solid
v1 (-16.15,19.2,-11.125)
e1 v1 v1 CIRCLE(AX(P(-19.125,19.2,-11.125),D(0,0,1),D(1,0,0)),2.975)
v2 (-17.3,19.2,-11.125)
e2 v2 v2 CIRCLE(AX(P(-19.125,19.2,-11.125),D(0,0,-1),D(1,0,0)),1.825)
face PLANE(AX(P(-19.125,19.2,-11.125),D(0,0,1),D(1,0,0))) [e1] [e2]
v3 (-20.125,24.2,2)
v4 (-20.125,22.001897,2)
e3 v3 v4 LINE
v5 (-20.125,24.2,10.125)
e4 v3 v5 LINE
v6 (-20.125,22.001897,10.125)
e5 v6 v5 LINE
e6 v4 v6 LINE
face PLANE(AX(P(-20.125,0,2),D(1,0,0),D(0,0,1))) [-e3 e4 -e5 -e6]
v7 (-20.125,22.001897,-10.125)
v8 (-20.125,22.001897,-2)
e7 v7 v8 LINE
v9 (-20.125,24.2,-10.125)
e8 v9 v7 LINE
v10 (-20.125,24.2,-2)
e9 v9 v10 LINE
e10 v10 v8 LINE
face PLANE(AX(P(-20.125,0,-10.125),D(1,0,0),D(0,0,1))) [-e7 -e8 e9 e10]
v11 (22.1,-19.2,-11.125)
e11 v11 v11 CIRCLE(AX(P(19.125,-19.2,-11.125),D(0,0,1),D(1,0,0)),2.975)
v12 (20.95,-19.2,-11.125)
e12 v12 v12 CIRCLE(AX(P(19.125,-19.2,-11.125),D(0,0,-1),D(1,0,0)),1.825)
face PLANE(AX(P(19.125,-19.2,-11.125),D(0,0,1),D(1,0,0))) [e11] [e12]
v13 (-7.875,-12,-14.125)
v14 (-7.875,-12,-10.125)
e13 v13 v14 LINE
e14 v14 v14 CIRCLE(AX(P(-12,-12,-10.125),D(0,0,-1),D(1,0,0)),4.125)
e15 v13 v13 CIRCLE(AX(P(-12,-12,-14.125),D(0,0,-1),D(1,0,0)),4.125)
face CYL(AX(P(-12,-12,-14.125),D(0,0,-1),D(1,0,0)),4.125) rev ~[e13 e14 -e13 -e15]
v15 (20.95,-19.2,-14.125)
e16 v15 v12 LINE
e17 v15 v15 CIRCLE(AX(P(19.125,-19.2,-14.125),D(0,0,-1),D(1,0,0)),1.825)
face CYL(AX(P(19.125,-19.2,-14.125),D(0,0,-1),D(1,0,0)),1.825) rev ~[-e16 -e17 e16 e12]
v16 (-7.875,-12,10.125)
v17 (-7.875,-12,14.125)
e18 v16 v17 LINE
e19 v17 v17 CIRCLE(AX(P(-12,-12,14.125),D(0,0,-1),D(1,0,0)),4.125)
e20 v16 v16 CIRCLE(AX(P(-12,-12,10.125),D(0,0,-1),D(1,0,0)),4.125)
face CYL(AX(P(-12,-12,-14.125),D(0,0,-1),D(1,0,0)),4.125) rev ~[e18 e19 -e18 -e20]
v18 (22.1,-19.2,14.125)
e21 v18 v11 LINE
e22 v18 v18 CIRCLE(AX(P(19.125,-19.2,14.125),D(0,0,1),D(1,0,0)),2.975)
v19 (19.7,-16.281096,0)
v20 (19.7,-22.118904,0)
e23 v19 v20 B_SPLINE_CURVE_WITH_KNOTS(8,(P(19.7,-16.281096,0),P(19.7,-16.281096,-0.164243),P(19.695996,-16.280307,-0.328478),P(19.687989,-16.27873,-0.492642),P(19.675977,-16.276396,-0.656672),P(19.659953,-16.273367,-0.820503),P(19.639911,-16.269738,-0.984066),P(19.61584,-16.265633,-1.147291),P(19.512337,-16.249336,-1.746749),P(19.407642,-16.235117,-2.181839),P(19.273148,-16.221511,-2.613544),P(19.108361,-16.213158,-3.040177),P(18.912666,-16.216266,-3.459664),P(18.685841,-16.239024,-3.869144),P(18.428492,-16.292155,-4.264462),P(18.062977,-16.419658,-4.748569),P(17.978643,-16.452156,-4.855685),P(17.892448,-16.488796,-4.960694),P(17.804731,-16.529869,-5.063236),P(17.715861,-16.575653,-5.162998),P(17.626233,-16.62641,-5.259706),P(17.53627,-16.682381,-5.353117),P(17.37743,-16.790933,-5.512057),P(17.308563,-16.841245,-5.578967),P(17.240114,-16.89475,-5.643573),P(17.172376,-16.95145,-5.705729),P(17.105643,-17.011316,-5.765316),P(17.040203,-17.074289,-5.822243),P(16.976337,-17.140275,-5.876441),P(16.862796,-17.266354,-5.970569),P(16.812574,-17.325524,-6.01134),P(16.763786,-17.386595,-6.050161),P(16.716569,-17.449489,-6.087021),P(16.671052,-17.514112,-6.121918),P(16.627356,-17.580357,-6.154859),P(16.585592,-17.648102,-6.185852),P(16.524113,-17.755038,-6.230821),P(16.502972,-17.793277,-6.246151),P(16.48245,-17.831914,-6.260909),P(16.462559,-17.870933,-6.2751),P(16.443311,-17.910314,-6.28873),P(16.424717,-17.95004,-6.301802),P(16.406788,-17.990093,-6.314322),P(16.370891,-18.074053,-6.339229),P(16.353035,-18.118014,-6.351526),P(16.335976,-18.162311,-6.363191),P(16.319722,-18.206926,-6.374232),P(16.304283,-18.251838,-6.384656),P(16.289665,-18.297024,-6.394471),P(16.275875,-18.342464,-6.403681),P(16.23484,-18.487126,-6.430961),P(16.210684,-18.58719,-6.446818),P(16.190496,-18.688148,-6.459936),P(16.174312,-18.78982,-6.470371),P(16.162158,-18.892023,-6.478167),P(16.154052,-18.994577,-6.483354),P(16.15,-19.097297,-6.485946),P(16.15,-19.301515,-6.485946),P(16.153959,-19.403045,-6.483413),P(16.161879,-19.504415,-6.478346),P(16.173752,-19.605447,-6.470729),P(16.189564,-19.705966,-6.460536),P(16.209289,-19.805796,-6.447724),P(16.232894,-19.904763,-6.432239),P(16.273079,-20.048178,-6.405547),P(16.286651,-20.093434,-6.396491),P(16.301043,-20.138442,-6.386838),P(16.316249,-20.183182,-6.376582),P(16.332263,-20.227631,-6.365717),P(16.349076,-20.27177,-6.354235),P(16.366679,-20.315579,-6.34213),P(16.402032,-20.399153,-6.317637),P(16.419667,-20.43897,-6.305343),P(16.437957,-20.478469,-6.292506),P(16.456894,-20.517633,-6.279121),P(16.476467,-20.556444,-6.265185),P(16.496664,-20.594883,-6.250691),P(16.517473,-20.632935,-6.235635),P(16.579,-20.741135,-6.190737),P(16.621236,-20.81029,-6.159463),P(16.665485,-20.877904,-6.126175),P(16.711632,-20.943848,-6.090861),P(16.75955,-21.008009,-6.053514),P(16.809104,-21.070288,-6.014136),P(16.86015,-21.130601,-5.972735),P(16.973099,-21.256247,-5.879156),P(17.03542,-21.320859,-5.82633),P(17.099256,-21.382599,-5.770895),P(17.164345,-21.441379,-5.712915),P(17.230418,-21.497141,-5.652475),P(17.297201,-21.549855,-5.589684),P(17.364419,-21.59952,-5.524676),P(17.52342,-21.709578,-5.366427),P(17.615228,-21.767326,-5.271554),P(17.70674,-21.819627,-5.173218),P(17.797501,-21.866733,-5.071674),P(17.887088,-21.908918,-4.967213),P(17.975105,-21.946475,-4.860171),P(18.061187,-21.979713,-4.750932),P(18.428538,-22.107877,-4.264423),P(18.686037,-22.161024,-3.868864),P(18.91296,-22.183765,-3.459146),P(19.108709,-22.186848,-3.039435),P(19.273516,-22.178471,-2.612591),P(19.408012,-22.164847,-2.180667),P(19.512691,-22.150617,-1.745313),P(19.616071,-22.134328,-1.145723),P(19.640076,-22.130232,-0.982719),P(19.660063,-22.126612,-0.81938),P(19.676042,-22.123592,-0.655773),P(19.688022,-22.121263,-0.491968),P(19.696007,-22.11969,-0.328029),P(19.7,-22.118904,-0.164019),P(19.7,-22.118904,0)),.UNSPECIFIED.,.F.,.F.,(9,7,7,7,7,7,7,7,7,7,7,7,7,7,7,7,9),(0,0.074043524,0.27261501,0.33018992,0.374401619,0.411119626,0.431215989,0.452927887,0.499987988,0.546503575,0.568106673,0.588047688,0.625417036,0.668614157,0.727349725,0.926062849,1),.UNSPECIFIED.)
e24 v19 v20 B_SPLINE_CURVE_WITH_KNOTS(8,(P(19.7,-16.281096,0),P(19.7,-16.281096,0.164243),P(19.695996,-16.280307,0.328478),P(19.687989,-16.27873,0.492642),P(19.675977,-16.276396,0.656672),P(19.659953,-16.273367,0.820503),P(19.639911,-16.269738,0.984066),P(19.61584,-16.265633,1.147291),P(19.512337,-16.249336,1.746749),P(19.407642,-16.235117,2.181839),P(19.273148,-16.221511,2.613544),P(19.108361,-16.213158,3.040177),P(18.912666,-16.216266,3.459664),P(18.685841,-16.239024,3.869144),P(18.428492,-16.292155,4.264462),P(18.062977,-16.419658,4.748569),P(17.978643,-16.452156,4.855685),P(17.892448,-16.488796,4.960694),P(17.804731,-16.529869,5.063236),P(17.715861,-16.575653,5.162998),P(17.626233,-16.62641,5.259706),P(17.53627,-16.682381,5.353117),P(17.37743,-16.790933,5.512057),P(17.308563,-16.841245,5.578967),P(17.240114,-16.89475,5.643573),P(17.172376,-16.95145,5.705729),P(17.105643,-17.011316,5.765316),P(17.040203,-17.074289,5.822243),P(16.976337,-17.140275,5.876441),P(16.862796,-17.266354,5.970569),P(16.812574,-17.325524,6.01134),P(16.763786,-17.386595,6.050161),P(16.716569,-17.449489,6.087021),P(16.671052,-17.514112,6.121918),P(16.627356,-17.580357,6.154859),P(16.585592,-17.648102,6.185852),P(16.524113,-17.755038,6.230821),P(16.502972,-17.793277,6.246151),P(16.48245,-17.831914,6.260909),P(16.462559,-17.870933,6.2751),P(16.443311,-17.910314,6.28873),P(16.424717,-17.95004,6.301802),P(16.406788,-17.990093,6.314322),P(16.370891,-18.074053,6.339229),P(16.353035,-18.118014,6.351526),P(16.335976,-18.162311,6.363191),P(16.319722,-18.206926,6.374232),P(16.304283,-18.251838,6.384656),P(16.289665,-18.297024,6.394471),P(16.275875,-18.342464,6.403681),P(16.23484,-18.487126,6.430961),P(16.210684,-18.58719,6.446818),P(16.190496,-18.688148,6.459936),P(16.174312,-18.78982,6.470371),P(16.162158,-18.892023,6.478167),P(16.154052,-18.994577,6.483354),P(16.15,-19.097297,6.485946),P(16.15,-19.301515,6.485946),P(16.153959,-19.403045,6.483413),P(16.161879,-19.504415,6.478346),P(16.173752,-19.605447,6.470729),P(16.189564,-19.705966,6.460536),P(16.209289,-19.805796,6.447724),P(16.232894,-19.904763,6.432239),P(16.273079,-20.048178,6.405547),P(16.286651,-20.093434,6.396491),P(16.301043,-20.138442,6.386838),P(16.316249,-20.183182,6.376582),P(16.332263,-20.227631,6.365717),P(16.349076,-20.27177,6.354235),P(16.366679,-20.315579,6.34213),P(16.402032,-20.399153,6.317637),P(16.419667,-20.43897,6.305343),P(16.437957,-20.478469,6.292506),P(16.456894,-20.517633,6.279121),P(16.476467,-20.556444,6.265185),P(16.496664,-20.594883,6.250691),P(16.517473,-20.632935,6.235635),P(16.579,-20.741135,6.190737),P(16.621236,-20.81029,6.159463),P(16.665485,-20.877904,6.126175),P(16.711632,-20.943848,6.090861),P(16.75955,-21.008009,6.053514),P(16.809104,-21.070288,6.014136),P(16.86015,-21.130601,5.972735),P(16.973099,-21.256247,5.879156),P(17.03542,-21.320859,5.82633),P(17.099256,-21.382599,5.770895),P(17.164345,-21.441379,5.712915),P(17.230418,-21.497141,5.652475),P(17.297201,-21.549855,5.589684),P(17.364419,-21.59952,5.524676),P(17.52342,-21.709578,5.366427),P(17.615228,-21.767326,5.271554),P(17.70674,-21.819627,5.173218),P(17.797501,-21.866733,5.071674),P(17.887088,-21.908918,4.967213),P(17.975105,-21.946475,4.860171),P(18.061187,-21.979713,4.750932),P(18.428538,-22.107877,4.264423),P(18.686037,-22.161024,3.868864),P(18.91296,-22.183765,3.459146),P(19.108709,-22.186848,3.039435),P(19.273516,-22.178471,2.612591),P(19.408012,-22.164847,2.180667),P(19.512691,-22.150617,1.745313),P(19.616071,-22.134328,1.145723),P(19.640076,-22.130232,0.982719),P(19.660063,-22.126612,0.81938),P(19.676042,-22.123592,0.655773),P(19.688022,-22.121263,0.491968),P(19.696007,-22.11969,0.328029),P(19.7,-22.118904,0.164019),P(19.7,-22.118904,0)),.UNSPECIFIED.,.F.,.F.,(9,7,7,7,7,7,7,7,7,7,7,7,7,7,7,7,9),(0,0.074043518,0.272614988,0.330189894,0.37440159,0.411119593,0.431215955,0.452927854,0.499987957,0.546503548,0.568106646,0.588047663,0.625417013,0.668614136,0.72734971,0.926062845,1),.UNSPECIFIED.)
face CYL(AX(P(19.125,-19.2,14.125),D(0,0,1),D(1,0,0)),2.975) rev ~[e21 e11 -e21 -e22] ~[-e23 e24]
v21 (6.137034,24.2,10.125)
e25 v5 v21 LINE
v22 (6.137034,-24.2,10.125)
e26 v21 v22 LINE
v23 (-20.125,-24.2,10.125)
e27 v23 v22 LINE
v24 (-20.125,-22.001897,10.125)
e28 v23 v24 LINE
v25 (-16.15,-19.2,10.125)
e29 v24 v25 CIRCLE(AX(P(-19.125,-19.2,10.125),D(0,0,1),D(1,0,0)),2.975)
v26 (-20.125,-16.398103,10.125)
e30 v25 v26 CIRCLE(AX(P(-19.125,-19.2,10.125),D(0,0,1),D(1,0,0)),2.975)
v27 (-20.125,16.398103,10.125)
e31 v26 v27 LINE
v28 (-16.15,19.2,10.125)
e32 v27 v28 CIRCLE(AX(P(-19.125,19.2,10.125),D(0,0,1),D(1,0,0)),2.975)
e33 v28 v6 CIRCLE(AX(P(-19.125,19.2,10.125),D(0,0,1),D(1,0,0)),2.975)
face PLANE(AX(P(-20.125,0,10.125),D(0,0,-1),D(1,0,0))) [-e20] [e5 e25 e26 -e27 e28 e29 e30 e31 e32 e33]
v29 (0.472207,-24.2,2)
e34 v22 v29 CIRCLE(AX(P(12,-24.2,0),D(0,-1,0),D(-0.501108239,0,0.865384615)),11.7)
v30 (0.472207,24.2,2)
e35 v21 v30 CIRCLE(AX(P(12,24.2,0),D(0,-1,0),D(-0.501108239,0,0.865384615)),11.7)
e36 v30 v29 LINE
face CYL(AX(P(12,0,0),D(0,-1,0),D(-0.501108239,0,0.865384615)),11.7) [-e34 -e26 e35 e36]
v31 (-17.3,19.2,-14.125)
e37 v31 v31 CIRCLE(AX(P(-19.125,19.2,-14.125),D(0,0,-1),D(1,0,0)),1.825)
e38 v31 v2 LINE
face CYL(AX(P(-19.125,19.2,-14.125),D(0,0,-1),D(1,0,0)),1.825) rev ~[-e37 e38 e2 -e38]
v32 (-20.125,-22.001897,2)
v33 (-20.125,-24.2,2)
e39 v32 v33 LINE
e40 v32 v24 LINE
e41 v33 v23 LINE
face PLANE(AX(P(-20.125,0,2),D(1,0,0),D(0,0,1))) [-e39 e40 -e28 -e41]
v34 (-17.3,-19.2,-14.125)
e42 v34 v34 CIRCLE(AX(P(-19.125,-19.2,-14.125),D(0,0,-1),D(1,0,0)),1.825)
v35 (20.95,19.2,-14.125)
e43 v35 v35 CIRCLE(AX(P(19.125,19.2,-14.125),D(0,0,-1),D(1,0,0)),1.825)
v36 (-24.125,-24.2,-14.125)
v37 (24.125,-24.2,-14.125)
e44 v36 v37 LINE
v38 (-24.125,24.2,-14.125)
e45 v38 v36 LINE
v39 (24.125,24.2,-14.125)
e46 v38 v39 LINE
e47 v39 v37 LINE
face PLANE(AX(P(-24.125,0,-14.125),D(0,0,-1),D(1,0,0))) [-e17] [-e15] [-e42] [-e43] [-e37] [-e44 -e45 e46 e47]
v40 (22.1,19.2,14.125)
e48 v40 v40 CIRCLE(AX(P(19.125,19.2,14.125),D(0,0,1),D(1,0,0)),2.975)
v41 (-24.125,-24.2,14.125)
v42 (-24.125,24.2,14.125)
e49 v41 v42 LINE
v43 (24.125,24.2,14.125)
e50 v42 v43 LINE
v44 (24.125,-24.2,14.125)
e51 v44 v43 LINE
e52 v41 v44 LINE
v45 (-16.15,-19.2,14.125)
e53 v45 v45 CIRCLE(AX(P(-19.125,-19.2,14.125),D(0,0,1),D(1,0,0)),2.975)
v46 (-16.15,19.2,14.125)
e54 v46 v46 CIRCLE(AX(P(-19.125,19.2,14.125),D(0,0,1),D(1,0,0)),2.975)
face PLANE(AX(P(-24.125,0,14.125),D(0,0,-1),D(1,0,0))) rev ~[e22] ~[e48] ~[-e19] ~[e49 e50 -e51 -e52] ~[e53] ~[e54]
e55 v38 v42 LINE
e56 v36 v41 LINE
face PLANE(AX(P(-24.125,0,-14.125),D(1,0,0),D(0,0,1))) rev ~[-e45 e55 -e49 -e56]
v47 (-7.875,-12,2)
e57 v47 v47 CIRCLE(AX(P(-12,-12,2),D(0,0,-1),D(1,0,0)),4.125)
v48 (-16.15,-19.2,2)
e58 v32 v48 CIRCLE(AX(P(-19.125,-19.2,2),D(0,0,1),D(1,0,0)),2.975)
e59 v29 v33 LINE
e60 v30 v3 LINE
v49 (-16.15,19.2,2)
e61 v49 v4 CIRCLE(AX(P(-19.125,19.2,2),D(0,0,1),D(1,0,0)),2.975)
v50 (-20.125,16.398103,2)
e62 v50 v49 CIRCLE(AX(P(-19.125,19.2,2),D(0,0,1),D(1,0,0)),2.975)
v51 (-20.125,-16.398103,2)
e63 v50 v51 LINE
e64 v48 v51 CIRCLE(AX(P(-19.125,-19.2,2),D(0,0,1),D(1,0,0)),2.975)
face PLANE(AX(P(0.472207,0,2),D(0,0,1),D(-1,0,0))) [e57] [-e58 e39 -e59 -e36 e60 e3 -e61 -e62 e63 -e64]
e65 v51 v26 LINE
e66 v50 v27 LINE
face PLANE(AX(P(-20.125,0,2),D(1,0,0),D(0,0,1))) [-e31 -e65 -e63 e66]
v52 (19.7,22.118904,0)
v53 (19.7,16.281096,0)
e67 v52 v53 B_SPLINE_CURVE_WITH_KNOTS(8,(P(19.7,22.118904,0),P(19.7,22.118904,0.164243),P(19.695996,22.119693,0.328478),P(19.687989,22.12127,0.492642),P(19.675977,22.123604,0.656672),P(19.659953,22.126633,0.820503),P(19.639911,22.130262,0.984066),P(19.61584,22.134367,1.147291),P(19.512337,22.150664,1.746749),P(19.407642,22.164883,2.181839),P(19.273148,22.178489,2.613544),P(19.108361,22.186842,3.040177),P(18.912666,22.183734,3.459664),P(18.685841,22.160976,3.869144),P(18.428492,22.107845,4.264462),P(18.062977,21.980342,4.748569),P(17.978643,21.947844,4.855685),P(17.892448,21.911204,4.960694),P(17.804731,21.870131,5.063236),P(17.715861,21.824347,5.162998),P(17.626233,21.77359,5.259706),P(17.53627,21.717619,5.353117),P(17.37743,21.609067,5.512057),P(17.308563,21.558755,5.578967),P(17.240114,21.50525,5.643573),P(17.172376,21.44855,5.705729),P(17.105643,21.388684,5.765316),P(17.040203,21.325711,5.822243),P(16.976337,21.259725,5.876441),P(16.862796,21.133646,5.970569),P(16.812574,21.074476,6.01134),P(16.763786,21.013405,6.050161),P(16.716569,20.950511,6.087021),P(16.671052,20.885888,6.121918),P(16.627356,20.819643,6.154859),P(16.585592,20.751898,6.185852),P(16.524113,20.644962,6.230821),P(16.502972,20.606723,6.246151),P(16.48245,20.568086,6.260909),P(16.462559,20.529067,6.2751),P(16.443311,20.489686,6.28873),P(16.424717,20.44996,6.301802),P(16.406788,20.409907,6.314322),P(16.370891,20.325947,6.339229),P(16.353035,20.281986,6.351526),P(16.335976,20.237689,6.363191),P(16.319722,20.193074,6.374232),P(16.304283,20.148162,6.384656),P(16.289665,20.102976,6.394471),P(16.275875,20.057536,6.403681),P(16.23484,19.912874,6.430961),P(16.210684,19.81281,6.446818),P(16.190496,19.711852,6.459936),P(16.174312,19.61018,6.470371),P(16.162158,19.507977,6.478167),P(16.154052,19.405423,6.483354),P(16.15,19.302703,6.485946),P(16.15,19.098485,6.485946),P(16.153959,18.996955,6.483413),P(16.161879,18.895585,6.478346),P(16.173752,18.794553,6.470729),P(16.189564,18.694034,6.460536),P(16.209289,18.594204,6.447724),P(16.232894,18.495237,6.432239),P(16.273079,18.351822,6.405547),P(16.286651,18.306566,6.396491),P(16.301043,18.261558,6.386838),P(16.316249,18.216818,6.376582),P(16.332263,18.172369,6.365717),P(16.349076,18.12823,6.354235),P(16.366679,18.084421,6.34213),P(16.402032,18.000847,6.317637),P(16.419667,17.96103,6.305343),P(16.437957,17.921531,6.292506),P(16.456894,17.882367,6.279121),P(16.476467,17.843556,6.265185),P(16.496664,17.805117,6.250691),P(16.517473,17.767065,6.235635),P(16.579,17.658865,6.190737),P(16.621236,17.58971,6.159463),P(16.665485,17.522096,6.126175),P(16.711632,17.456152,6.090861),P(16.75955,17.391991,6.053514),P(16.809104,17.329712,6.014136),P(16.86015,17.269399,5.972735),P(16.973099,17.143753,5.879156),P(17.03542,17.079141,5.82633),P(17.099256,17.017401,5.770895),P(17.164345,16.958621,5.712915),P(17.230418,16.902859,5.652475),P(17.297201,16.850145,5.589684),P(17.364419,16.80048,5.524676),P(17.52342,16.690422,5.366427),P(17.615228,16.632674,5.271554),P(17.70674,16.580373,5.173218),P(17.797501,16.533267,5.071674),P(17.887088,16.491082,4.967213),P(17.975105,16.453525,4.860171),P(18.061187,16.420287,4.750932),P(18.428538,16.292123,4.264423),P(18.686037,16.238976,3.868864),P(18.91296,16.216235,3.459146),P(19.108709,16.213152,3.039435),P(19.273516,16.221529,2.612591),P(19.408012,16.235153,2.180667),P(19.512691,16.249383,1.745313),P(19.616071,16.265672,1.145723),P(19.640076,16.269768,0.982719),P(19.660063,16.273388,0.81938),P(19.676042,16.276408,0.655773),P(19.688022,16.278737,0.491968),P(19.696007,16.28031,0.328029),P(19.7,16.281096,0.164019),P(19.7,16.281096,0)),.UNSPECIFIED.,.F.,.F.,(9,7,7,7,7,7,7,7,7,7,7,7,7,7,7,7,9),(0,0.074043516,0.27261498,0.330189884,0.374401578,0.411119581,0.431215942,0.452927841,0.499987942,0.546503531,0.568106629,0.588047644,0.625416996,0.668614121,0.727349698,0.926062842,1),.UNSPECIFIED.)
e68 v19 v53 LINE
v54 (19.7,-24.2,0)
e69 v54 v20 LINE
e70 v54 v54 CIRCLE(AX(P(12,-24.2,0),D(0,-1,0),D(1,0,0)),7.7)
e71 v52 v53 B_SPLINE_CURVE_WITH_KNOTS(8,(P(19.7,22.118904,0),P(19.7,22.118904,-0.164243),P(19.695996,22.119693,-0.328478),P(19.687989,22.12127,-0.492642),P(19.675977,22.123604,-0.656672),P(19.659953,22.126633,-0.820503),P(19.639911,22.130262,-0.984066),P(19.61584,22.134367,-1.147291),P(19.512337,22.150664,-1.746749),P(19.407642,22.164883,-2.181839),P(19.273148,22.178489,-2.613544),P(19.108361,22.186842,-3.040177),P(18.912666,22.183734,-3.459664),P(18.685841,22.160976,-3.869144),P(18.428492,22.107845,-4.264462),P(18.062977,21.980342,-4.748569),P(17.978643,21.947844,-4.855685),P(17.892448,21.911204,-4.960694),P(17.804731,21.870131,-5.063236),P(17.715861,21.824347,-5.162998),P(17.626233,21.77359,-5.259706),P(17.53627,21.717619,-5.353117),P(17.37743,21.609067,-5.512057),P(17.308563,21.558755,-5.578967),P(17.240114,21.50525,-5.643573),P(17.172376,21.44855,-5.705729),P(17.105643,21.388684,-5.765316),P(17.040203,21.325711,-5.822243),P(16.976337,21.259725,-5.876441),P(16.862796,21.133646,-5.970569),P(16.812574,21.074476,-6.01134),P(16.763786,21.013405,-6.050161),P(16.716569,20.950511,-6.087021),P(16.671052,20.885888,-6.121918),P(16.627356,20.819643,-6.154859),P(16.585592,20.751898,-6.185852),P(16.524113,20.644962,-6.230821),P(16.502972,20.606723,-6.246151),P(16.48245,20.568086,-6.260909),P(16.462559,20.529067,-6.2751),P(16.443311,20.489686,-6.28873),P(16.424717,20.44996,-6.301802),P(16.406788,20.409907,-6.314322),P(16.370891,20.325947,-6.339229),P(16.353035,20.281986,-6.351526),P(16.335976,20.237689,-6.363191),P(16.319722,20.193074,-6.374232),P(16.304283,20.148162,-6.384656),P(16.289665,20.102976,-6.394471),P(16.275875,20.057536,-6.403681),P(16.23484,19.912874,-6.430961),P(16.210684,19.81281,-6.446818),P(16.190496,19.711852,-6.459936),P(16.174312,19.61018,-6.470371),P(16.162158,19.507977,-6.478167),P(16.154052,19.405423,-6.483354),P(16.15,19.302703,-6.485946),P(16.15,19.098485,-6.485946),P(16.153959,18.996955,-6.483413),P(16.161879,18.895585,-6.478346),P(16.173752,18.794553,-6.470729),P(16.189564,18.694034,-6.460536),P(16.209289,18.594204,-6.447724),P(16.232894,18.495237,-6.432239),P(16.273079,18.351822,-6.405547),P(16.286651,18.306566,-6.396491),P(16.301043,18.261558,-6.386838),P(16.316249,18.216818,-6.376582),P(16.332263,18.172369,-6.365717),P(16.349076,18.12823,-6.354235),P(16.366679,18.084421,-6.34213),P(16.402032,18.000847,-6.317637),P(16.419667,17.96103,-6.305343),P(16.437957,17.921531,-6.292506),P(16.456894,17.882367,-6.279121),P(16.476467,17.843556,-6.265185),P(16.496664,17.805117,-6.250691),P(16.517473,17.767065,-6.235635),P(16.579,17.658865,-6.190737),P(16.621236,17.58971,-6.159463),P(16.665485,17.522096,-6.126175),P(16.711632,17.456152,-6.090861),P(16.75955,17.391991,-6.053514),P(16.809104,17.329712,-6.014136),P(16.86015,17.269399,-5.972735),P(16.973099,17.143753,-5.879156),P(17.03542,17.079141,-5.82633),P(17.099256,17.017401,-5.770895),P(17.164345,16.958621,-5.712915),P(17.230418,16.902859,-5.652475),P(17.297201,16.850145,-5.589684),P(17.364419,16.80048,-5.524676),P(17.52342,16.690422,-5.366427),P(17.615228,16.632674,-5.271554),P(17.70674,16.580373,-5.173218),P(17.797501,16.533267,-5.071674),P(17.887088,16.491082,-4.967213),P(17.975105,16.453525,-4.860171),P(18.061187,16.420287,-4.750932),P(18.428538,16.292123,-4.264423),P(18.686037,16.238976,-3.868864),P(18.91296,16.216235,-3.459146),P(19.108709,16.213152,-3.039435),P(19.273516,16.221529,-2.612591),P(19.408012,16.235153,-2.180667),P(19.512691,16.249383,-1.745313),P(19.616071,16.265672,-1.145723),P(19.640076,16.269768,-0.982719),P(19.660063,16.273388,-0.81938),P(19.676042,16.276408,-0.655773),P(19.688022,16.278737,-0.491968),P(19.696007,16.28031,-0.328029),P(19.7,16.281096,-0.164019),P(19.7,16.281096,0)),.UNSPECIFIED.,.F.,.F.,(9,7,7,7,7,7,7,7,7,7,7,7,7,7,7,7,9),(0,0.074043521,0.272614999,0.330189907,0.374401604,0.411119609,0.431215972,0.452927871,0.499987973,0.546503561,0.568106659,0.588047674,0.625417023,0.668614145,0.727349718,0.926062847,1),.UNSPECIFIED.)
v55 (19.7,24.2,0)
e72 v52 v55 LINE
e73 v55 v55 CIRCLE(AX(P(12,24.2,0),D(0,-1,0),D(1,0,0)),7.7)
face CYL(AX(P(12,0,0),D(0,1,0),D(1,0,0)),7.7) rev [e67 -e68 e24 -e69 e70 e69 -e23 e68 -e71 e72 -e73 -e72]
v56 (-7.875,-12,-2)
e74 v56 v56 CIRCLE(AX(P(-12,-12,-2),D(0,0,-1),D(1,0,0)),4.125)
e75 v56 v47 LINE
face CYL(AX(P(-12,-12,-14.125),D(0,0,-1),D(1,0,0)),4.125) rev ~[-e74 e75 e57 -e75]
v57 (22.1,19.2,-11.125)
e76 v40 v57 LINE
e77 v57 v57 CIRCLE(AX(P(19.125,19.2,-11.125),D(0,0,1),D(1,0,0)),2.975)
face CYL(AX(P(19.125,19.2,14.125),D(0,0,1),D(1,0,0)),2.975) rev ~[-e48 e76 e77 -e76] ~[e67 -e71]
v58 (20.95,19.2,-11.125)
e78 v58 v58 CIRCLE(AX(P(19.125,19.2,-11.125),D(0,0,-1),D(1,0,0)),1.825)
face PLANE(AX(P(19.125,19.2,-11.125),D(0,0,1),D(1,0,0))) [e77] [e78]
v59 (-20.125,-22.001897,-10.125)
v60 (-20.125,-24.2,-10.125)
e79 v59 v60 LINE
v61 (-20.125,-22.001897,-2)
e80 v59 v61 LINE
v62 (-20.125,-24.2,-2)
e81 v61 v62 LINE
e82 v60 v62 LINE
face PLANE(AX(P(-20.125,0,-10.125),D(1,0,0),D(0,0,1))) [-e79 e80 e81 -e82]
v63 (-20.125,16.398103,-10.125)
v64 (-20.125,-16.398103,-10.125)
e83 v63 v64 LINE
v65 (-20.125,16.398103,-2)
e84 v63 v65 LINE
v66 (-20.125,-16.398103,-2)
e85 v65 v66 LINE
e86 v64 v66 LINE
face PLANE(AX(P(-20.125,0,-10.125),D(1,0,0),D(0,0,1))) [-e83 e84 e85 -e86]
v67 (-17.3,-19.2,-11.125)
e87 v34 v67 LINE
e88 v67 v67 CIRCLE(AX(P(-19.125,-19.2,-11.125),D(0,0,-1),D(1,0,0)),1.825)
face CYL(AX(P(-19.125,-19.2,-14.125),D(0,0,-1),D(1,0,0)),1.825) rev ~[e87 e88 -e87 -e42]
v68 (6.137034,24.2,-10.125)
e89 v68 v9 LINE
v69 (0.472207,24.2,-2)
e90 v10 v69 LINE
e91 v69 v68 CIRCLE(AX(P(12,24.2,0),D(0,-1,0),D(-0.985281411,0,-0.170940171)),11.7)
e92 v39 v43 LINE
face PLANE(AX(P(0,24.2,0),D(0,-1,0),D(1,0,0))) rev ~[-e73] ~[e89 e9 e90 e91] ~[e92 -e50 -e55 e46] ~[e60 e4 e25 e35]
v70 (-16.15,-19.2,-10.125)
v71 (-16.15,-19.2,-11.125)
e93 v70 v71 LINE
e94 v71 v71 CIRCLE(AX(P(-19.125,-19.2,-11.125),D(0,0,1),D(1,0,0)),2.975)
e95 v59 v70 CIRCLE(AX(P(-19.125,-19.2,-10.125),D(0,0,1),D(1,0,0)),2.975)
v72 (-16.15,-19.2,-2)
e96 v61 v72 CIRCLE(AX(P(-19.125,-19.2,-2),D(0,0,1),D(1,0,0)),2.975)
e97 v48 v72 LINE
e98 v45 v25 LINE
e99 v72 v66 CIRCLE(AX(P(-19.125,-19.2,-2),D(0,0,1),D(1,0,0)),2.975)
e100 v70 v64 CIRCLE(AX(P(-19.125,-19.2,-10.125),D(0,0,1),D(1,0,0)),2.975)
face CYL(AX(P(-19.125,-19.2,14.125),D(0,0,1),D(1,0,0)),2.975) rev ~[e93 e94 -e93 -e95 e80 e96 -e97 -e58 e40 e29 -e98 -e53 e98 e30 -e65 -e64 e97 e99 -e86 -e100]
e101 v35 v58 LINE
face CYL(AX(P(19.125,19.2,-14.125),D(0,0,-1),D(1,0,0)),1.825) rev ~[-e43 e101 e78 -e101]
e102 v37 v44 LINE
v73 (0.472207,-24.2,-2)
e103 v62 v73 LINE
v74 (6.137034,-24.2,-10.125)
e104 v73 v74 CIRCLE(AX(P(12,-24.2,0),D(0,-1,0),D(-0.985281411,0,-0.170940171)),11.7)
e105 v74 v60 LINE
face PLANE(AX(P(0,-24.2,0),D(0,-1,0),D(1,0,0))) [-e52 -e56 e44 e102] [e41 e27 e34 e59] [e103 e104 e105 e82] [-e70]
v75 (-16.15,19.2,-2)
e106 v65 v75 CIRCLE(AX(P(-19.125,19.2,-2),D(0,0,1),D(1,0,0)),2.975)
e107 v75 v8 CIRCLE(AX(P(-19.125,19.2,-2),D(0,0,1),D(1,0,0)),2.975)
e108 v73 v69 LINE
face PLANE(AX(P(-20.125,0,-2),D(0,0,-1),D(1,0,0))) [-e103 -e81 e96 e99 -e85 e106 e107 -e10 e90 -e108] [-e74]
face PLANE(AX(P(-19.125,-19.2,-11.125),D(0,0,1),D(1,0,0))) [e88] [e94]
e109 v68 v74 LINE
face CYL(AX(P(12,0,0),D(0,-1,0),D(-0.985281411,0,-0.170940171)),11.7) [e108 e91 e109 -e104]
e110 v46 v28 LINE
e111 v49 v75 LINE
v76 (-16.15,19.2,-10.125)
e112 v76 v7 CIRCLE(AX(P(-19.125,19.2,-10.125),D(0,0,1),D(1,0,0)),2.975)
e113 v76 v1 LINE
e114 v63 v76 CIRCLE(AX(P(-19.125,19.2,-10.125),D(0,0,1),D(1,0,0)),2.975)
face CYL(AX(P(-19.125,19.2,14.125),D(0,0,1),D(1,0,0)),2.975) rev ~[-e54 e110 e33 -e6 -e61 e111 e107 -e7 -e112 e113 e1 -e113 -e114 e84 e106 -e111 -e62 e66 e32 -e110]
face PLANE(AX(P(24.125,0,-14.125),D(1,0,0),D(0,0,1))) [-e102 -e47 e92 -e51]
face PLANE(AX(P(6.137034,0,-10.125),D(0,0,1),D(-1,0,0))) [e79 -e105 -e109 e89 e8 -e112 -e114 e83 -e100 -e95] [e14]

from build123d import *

# Parameters (mm, degrees)
F2_W     = 48.25
F2_H     = 28.25
F2_R     = 7.7
F3_DEPTH = 24.2
F5_R     = 2.975
F6_DEPTH = 25.25
F4_R     = 1.825
F7_DEPTH = 28.25
F4_R_2   = 4.125
F8_DEPTH = 28.25


# Not quite as in the source:
# - a feature names something its author has since deleted; it is built from what else it names


with BuildPart() as f3:
    # F2 (on Front) → F3 (new body, symmetric)
    with BuildSketch(Plane.XZ):
        Rectangle(F2_W, F2_H)
        with BuildLine():
            ThreePointArc((23.5277925033, 2), (23.6568686252, 1.0037000824), (23.7, 0))
            ThreePointArc((23.7, 0), (23.6568686252, -1.0037000824), (23.5277925033, -2))
            ThreePointArc((23.5277925033, -2), (22.3372126342, -5.4801491728), (20.125, -8.4186920005))
            Line((20.125, -8.4186920005), (20.125, -10.125))
            Line((20.125, -10.125), (17.8629663994, -10.125))
            ThreePointArc((17.8629663994, -10.125), (15.9935594213, -10.9973398215), (14, -11.5277925033))
            ThreePointArc((14, -11.5277925033), (12, -11.7), (10, -11.5277925033))
            ThreePointArc((10, -11.5277925033), (8.0064405787, -10.9973398215), (6.1370336006, -10.125))
            Line((6.1370336006, -10.125), (-20.125, -10.125))
            Line((-20.125, -10.125), (-20.125, -2))
            Line((-20.125, -2), (-20.125, 2))
            Line((-20.125, 2), (-20.125, 10.125))
            Line((-20.125, 10.125), (6.1370336006, 10.125))
            ThreePointArc((6.1370336006, 10.125), (8.0064405787, 10.9973398215), (10, 11.5277925033))
            ThreePointArc((10, 11.5277925033), (12, 11.7), (14, 11.5277925033))
            ThreePointArc((14, 11.5277925033), (15.9935594213, 10.9973398215), (17.8629663994, 10.125))
            Line((17.8629663994, 10.125), (20.125, 10.125))
            Line((20.125, 10.125), (20.125, 8.4186920005))
            ThreePointArc((20.125, 8.4186920005), (22.3372126342, 5.4801491728), (23.5277925033, 2))
        make_face(mode=Mode.SUBTRACT)
        with BuildLine():
            Line((14, 10.125), (14, 11.5277925033))
            ThreePointArc((14, 11.5277925033), (12, 11.7), (10, 11.5277925033))
            Line((10, 11.5277925033), (10, 10.125))
            Line((10, 10.125), (14, 10.125))
        make_face()
        with BuildLine():
            Line((20.125, 2), (20.125, 8.4186920005))
            ThreePointArc((20.125, 8.4186920005), (19.045826619, 9.3405742466), (17.8629663994, 10.125))
            Line((17.8629663994, 10.125), (14, 10.125))
            Line((14, 10.125), (10, 10.125))
            Line((10, 10.125), (6.1370336006, 10.125))
            ThreePointArc((6.1370336006, 10.125), (2.4024206149, 6.6915222444), (0.4722074967, 2))
            ThreePointArc((0.4722074967, 2), (0.3, 0), (0.4722074967, -2))
            ThreePointArc((0.4722074967, -2), (2.4024206149, -6.6915222444), (6.1370336006, -10.125))
            Line((6.1370336006, -10.125), (10, -10.125))
            Line((10, -10.125), (14, -10.125))
            Line((14, -10.125), (17.8629663994, -10.125))
            ThreePointArc((17.8629663994, -10.125), (19.045826619, -9.3405742466), (20.125, -8.4186920005))
            Line((20.125, -8.4186920005), (20.125, -2))
            Line((20.125, -2), (20.125, 2))
        make_face()
        with Locations((12, 0)):
            Circle(F2_R, mode=Mode.SUBTRACT)
        with BuildLine():
            ThreePointArc((10, -11.5277925033), (12, -11.7), (14, -11.5277925033))
            Line((14, -11.5277925033), (14, -10.125))
            Line((14, -10.125), (10, -10.125))
            Line((10, -10.125), (10, -11.5277925033))
        make_face()
        with BuildLine():
            ThreePointArc((0.4722074967, -2), (0.3, 0), (0.4722074967, 2))
            Line((0.4722074967, 2), (-20.125, 2))
            Line((-20.125, 2), (-20.125, -2))
            Line((-20.125, -2), (0.4722074967, -2))
        make_face()
        with BuildLine():
            ThreePointArc((23.5277925033, -2), (23.6568686252, -1.0037000824), (23.7, 0))
            ThreePointArc((23.7, 0), (23.6568686252, 1.0037000824), (23.5277925033, 2))
            Line((23.5277925033, 2), (20.125, 2))
            Line((20.125, 2), (20.125, -2))
            Line((20.125, -2), (23.5277925033, -2))
        make_face()
        with BuildLine():
            Line((20.125, 2), (23.5277925033, 2))
            ThreePointArc((23.5277925033, 2), (22.3372126342, 5.4801491728), (20.125, 8.4186920005))
            Line((20.125, 8.4186920005), (20.125, 2))
        make_face()
        with BuildLine():
            ThreePointArc((20.125, -8.4186920005), (22.3372126342, -5.4801491728), (23.5277925033, -2))
            Line((23.5277925033, -2), (20.125, -2))
            Line((20.125, -2), (20.125, -8.4186920005))
        make_face()
        with BuildLine():
            Line((14, 10.125), (17.8629663994, 10.125))
            ThreePointArc((17.8629663994, 10.125), (15.9935594213, 10.9973398215), (14, 11.5277925033))
            Line((14, 11.5277925033), (14, 10.125))
        make_face()
        with BuildLine():
            Line((10, 10.125), (10, 11.5277925033))
            ThreePointArc((10, 11.5277925033), (8.0064405787, 10.9973398215), (6.1370336006, 10.125))
            Line((6.1370336006, 10.125), (10, 10.125))
        make_face()
        with BuildLine():
            ThreePointArc((14, -11.5277925033), (15.9935594213, -10.9973398215), (17.8629663994, -10.125))
            Line((17.8629663994, -10.125), (14, -10.125))
            Line((14, -10.125), (14, -11.5277925033))
        make_face()
        with BuildLine():
            ThreePointArc((6.1370336006, -10.125), (8.0064405787, -10.9973398215), (10, -11.5277925033))
            Line((10, -11.5277925033), (10, -10.125))
            Line((10, -10.125), (6.1370336006, -10.125))
        make_face()
        with BuildLine():
            ThreePointArc((17.8629663994, 10.125), (19.045826619, 9.3405742466), (20.125, 8.4186920005))
            Line((20.125, 8.4186920005), (20.125, 10.125))
            Line((20.125, 10.125), (17.8629663994, 10.125))
        make_face()
        with BuildLine():
            Line((20.125, -10.125), (20.125, -8.4186920005))
            ThreePointArc((20.125, -8.4186920005), (19.045826619, -9.3405742466), (17.8629663994, -10.125))
            Line((17.8629663994, -10.125), (20.125, -10.125))
        make_face()
    extrude(amount=F3_DEPTH, both=True)

    # F5 (on face) → F6 (cut)
    with BuildSketch(Plane.XY.offset(14.125)):
        with Locations((-19.125, 19.2)):
            Circle(F5_R)
        with Locations((19.125, -19.2)):
            Circle(F5_R)
        with Locations((-19.125, -19.2)):
            Circle(F5_R)
        with Locations((19.125, 19.2)):
            Circle(F5_R)
    extrude(amount=-F6_DEPTH, mode=Mode.SUBTRACT)

    # F4 (on face) → F7 (cut)
    with BuildSketch(Plane(origin=(0, 0, -14.125), x_dir=(1, 0, 0), z_dir=(0, 0, -1))):
        with Locations((-19.125, 19.2)):
            Circle(F4_R)
        with Locations((19.125, 19.2)):
            Circle(F4_R)
        with Locations((19.125, -19.2)):
            Circle(F4_R)
        with Locations((-19.125, -19.2)):
            Circle(F4_R)
    extrude(amount=-F7_DEPTH, mode=Mode.SUBTRACT)

    # F4 (on face) → F8 (cut)
    with BuildSketch(Plane(origin=(0, 0, -14.125), x_dir=(1, 0, 0), z_dir=(0, 0, -1))):
        with Locations((-12, 12)):
            Circle(F4_R_2)
    extrude(amount=-F8_DEPTH, mode=Mode.SUBTRACT)


solid = f3.part
